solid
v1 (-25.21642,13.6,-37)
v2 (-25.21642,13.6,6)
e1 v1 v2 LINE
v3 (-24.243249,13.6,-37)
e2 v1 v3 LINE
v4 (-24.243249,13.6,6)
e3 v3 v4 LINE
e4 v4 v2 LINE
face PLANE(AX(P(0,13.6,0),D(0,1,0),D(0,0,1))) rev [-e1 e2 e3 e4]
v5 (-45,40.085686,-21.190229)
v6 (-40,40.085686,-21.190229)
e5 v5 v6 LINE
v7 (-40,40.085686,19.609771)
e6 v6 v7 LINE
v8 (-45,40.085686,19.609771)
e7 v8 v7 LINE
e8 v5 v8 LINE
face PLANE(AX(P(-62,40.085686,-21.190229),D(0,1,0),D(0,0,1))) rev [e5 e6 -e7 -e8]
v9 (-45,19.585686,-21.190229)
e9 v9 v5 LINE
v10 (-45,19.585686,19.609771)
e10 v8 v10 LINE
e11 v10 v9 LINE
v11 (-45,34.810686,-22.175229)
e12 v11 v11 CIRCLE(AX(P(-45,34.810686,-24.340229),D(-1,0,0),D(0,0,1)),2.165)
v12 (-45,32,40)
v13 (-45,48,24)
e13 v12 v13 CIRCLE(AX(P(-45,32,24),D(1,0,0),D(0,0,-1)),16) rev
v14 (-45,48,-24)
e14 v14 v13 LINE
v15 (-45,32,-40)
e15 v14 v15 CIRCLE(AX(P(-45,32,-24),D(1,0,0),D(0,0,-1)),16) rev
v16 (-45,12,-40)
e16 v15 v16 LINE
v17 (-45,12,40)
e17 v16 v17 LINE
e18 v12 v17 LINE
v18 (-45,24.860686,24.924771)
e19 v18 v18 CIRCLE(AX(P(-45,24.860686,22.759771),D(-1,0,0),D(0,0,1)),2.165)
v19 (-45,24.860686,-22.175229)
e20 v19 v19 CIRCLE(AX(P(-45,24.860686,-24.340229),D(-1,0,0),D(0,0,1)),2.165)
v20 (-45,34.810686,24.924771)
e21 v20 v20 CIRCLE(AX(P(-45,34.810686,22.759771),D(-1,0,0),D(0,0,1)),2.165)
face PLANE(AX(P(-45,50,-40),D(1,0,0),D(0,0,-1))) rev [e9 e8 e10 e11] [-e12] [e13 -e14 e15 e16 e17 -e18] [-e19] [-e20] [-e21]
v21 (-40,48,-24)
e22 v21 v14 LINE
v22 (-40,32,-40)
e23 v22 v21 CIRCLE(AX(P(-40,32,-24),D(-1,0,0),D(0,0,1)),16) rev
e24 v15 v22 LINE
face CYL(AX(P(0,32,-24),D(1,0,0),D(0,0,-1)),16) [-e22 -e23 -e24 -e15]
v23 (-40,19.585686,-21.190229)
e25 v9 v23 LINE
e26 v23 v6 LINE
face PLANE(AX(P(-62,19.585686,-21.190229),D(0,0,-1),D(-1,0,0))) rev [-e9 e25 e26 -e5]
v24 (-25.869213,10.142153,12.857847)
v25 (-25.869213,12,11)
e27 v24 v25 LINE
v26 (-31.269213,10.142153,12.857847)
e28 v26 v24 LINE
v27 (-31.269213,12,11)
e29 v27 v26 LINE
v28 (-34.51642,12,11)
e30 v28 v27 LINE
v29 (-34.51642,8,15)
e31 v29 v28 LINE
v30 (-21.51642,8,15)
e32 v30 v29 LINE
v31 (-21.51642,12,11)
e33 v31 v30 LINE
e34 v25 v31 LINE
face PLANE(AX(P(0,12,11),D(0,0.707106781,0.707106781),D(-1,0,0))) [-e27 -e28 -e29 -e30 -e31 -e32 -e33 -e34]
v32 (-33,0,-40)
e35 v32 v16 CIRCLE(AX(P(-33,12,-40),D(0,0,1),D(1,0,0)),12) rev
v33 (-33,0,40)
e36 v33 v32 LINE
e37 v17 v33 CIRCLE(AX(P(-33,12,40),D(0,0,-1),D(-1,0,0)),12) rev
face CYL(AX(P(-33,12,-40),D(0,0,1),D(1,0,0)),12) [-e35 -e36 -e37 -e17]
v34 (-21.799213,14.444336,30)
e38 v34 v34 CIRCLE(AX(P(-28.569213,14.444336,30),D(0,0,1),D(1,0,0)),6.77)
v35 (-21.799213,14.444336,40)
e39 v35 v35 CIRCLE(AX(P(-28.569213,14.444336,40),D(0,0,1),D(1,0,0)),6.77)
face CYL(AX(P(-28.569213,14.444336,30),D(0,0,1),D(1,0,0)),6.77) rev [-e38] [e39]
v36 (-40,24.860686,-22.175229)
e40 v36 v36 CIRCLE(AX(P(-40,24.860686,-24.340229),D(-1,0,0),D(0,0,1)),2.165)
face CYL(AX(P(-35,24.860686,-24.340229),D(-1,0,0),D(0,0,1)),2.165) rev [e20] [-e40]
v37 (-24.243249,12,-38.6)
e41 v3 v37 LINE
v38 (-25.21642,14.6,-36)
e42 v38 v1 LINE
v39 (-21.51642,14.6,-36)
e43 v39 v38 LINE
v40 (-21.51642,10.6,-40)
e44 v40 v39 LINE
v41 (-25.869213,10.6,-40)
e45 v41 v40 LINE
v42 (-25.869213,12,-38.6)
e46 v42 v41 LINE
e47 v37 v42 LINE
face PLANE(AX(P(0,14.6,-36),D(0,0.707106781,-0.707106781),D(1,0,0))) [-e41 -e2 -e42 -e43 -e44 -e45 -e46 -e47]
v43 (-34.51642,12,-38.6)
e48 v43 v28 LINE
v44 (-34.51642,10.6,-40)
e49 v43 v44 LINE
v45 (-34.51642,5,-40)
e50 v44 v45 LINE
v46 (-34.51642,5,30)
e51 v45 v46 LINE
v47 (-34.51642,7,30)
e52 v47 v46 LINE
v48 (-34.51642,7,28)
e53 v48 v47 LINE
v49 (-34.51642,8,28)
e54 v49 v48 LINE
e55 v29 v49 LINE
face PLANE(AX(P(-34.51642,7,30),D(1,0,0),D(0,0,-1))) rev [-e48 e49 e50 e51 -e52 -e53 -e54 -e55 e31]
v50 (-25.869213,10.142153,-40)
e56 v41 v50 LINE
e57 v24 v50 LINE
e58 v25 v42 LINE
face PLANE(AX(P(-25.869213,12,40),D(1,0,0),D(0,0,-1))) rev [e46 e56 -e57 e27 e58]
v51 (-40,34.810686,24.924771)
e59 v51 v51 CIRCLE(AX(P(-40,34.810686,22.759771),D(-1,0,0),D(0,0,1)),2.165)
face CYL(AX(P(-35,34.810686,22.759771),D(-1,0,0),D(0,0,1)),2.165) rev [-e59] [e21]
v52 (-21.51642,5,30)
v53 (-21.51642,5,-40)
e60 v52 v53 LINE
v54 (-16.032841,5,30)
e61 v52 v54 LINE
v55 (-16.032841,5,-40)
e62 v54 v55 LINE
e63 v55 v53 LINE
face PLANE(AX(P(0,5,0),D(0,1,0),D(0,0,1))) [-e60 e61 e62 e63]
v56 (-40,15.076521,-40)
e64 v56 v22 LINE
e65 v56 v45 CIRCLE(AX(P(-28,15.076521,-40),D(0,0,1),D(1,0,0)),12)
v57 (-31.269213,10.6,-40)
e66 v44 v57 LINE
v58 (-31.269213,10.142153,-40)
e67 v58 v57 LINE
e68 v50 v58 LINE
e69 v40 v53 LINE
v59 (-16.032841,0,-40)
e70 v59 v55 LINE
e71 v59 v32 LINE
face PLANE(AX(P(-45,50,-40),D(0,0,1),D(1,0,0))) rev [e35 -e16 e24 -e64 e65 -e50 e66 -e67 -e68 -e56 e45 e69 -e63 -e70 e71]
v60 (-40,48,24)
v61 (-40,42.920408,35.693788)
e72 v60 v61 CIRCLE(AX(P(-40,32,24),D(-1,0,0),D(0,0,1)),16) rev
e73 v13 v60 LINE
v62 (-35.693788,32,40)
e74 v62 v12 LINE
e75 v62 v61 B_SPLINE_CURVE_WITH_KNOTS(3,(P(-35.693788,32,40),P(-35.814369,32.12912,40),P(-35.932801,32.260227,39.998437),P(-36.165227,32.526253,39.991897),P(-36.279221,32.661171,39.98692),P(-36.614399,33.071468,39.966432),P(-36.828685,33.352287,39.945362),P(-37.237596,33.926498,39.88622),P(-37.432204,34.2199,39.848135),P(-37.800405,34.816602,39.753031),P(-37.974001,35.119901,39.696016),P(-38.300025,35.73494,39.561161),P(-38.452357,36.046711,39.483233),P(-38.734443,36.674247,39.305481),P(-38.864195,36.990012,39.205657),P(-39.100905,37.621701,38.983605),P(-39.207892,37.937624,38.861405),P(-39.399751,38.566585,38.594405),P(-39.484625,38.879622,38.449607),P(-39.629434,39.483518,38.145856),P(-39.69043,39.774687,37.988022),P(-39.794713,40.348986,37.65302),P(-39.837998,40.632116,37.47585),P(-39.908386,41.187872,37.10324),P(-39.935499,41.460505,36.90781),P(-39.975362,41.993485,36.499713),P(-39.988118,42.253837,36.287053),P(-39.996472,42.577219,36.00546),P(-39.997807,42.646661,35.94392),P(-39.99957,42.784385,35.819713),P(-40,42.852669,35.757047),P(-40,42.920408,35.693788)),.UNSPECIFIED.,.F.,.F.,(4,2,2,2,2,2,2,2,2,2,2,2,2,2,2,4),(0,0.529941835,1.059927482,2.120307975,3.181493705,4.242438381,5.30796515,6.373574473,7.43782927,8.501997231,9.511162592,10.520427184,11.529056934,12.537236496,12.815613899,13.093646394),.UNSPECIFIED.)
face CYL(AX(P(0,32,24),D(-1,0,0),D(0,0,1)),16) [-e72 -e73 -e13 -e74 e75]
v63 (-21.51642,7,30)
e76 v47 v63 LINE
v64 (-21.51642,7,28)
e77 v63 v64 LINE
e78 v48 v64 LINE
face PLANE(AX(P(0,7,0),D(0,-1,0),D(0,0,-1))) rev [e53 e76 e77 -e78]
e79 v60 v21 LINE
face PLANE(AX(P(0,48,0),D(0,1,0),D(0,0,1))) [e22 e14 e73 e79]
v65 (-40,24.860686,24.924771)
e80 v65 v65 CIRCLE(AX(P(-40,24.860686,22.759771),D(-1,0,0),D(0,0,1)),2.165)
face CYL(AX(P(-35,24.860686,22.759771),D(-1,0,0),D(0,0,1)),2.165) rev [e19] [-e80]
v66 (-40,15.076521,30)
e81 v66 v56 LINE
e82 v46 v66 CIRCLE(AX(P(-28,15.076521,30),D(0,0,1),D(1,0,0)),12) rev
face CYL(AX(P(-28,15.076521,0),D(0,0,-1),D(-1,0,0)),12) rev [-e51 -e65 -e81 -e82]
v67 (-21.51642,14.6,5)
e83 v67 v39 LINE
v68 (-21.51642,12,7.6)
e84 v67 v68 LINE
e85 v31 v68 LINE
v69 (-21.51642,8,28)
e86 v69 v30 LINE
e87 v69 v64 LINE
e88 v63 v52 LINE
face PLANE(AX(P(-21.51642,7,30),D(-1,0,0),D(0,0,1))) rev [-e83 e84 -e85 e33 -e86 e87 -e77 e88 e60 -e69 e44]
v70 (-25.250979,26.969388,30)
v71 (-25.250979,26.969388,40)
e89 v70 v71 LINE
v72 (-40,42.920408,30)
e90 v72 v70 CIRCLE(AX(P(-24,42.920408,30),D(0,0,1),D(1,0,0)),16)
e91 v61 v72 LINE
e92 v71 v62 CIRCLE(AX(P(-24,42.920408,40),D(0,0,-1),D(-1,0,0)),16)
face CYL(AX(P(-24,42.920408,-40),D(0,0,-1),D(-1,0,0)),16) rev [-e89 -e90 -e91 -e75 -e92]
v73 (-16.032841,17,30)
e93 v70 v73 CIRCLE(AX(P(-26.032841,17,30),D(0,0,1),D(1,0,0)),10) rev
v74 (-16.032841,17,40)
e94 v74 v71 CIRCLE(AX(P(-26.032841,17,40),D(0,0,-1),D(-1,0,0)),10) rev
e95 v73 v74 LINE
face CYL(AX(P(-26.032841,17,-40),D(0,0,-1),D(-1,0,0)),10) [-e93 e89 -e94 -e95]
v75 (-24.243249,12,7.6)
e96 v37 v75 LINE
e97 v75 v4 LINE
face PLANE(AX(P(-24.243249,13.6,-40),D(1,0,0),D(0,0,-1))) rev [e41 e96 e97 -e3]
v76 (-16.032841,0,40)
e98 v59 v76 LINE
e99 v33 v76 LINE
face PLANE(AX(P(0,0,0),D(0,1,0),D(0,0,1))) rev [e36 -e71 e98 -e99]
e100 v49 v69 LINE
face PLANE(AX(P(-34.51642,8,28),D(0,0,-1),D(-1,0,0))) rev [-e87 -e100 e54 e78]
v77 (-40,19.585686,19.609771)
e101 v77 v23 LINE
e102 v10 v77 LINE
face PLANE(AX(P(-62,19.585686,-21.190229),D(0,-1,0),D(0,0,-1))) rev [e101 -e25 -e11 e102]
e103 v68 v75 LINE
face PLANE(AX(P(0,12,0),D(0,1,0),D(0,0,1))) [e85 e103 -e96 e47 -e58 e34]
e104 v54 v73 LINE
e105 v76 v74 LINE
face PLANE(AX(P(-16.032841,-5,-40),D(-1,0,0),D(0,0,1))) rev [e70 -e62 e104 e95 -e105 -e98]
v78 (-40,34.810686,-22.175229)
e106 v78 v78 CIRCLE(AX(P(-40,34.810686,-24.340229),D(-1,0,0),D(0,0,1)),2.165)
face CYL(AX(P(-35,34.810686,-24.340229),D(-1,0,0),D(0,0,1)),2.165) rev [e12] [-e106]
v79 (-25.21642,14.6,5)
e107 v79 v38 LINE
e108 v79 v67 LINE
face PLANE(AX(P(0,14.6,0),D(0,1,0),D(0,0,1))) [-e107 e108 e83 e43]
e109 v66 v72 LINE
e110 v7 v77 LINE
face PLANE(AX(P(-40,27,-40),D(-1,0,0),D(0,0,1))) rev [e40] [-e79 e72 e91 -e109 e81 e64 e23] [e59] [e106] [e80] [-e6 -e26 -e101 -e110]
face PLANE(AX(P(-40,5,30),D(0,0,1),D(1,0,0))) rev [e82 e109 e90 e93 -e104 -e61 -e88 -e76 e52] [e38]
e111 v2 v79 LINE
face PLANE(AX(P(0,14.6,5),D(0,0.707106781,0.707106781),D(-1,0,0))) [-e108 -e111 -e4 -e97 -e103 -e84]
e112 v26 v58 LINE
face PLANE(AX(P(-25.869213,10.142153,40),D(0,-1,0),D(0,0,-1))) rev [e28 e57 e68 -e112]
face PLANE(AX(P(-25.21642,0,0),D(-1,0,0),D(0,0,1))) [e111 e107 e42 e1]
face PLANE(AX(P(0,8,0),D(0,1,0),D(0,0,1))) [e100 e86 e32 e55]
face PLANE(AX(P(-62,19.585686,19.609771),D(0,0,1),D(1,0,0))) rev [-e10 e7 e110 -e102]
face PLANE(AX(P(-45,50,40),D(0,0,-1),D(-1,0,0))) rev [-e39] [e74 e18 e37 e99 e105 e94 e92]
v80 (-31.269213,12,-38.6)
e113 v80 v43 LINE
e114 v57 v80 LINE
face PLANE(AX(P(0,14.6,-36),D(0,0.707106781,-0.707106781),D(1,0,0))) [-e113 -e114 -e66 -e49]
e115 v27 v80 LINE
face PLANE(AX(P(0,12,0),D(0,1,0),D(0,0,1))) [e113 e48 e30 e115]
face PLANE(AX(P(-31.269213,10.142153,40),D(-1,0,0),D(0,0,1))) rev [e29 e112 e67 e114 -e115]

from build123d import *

# Parameters (mm, degrees)
CROQUIS1_W              = 90
CROQUIS1_H              = 80
SALIENTE_EXTRUIR1_DEPTH = 50
CROQUIS2_W              = 85
CROQUIS2_H              = 80
CORTAR_EXTRUIR1_DEPTH   = 23
CROQUIS3_W              = 61.032840672
CROQUIS3_H              = 80
CORTAR_EXTRUIR2_DEPTH   = 32
CROQUIS4_W              = 23.967159328
CROQUIS4_H              = 70
CORTAR_EXTRUIR3_DEPTH   = 22
CROQUIS7_R              = 6.77
CORTAR_EXTRUIR6_DEPTH   = 10
CROQUIS11_W             = 13
CROQUIS11_H             = 70
SALIENTE_EXTRUIR2_DEPTH = 2
CROQUIS12_W             = 13
CROQUIS12_H             = 55
SALIENTE_EXTRUIR3_DEPTH = 5
REDONDEO3_R             = 12
REDONDEO4_R             = 12
CROQUIS14_W             = 13
CROQUIS14_H             = 13
SALIENTE_EXTRUIR4_DEPTH = 1
CROQUIS17_W             = 2.726828244
CROQUIS17_H             = 50
SALIENTE_EXTRUIR5_DEPTH = 1.6
CROQUIS18_W             = 5
CROQUIS18_H             = 50
SALIENTE_EXTRUIR6_DEPTH = 1
CHAFL_N2_SIZE           = 4
CHAFL_N4_SIZE           = 4
CROQUIS19_R             = 2.165
CORTAR_EXTRUIR10_DEPTH  = 10
CROQUIS20_W             = 5.4
CROQUIS20_H             = 1.857846889
CORTAR_EXTRUIR11_DEPTH  = 80
REDONDEO10_R            = 10
CROQUIS23_W             = 40.8
CROQUIS23_H             = 20.5
CORTAR_EXTRUIR12_DEPTH  = 22
CROQUIS24_W             = 5
CROQUIS24_H             = 80
CORTAR_EXTRUIR14_DEPTH  = 2
REDONDEO13_R            = 16
REDONDEO14_START        = 30
REDONDEO14_DEPTH        = 2.2192
REDONDEO14_START_2      = 32.2192
REDONDEO14_2_DEPTH      = 7.7808
REDONDEO14_START_3      = -40
REDONDEO14_3_DEPTH      = 14.749021125
CORTAR_EXTRUIR16_DEPTH  = 1.3
CHAFL_N5_SIZE           = 5


with BuildPart() as part:
    # Croquis1 → Saliente-Extruir1 (new body)
    with BuildSketch(Plane(origin=(0, 0, 0), x_dir=(1, 0, 0), z_dir=(0, 1, 0))):
        Rectangle(CROQUIS1_W, CROQUIS1_H)
    extrude(amount=SALIENTE_EXTRUIR1_DEPTH)

    # Croquis2 → Cortar-Extruir1 (cut)
    with BuildSketch(Plane(origin=(0, 50, 0), x_dir=(1, 0, 0), z_dir=(0, 1, 0))):
        with Locations((2.5, 0)):
            Rectangle(CROQUIS2_W, CROQUIS2_H)
    extrude(amount=-CORTAR_EXTRUIR1_DEPTH, mode=Mode.SUBTRACT)

    # Croquis3 → Cortar-Extruir2 (cut)
    with BuildSketch(Plane(origin=(0, 27, 0), x_dir=(1, 0, 0), z_dir=(0, 1, 0))):
        with Locations((14.483579664, 0)):
            Rectangle(CROQUIS3_W, CROQUIS3_H)
    extrude(amount=-CORTAR_EXTRUIR2_DEPTH, mode=Mode.SUBTRACT)

    # Croquis4 → Cortar-Extruir3 (cut)
    with BuildSketch(Plane(origin=(0, 27, 0), x_dir=(1, 0, 0), z_dir=(0, 1, 0))):
        with Locations((-28.016420336, 5)):
            Rectangle(CROQUIS4_W, CROQUIS4_H)
    extrude(amount=-CORTAR_EXTRUIR3_DEPTH, mode=Mode.SUBTRACT)

    # Croquis7 → Cortar-Extruir6 (cut)
    with BuildSketch(Plane.XY.offset(40)):
        with Locations((-28.569213332, 14.444335644)):
            Circle(CROQUIS7_R)
    extrude(amount=-CORTAR_EXTRUIR6_DEPTH, mode=Mode.SUBTRACT)

    # Croquis11 → Saliente-Extruir2 (add)
    with BuildSketch(Plane(origin=(0, 5, 0), x_dir=(1, 0, 0), z_dir=(0, 1, 0))):
        with Locations((-28.016420336, 5)):
            Rectangle(CROQUIS11_W, CROQUIS11_H)
    extrude(amount=SALIENTE_EXTRUIR2_DEPTH)

    # Croquis12 → Saliente-Extruir3 (add)
    with BuildSketch(Plane(origin=(0, 7, 0), x_dir=(1, 0, 0), z_dir=(0, 1, 0))):
        with Locations((-28.016420336, 12.5)):
            Rectangle(CROQUIS12_W, CROQUIS12_H)
    extrude(amount=SALIENTE_EXTRUIR3_DEPTH)

    # Redondeo3
    # the kernel refuses this fillet: 12 mm, written as the material it adds along each edge
    with BuildSketch(Plane(origin=(-40, 5, 30), x_dir=(1.0, 1.01847082473682e-12, 0), z_dir=(0, 0, -1))) as redondeo3_piece_1:
        with BuildLine():
            CenterArc((12, -10.076520531), REDONDEO3_R, 122.890486336, 57.109513664)
            Line((0, -10.076520531), (-0.24, -10.076520531))
            Line((-0.24, -10.076520531), (-0.24, 0))
            Line((-0.24, 0), (0, 0.24))
            ThreePointArc((0, 0.24), (2.741789832, 0.24), (5.353251257, 0.201530411))
            Line((5.353251257, 0.201530411), (5.483579664, 0))
        make_face()
    extrude(amount=70)

    # Redondeo4
    redondeo4_edges = [part.edges().sort_by_distance(p)[0] for p in [
        (-45, 0, 0),
    ]]
    fillet(redondeo4_edges, radius=REDONDEO4_R)

    # Croquis14 → Saliente-Extruir4 (add)
    with BuildSketch(Plane(origin=(0, 7, 0), x_dir=(1, 0, 0), z_dir=(0, 1, 0))):
        with Locations((-28.016420336, -21.5)):
            Rectangle(CROQUIS14_W, CROQUIS14_H)
    extrude(amount=SALIENTE_EXTRUIR4_DEPTH)

    # Croquis17 → Saliente-Extruir5 (add)
    with BuildSketch(Plane(origin=(0, 12, 0), x_dir=(1, 0, 0), z_dir=(0, 1, 0))):
        with Locations((-22.879834458, 15)):
            Rectangle(CROQUIS17_W, CROQUIS17_H)
    extrude(amount=SALIENTE_EXTRUIR5_DEPTH)

    # Croquis18 → Saliente-Extruir6 (add)
    with BuildSketch(Plane(origin=(0, 13.6, 0), x_dir=(1, 0, 0), z_dir=(0, 1, 0))):
        with Locations((-24.016420336, 15)):
            Rectangle(CROQUIS18_W, CROQUIS18_H)
    extrude(amount=SALIENTE_EXTRUIR6_DEPTH)

    # Chaflán2
    chafl_n2_edges = [part.edges().sort_by_distance(p)[0] for p in [
        (-28.016420336, 12, 15),
    ]]
    chamfer(chafl_n2_edges, length=CHAFL_N2_SIZE - 0.0001)  # a hair under: the kernel refuses the full size

    # Chaflán4
    chafl_n4_edges = [part.edges().sort_by_distance(p)[0] for p in [
        (-24.016420336, 14.6, -40),
    ]]
    chamfer(chafl_n4_edges, length=CHAFL_N4_SIZE)

    # Croquis19 → Cortar-Extruir10 (cut)
    with BuildSketch(Plane.ZY.offset(45)):
        with Locations((-24.340228639, 34.810686035)):
            Circle(CROQUIS19_R)
        with Locations((-24.340228639, 24.860686035)):
            Circle(CROQUIS19_R)
        with Locations((22.759771361, 34.810686035)):
            Circle(CROQUIS19_R)
        with Locations((22.759771361, 24.860686035)):
            Circle(CROQUIS19_R)
    extrude(amount=-CORTAR_EXTRUIR10_DEPTH, mode=Mode.SUBTRACT)

    # Croquis20 → Cortar-Extruir11 (cut)
    with BuildSketch(Plane(origin=(0, 0, -40), x_dir=(-1, 0, 0), z_dir=(0, 0, -1))):
        with Locations((28.569213332, 11.071076555)):
            Rectangle(CROQUIS20_W, CROQUIS20_H)
    extrude(amount=-CORTAR_EXTRUIR11_DEPTH, mode=Mode.SUBTRACT)

    # Redondeo10
    redondeo10_edges = [part.edges().sort_by_distance(p)[0] for p in [
        (-16.032840672, 27, 35),
    ]]
    fillet(redondeo10_edges, radius=REDONDEO10_R)

    # Croquis23 → Cortar-Extruir12 (cut)
    with BuildSketch(Plane(origin=(-40, 0, 0), x_dir=(0, 0, -1), z_dir=(1, 0, 0))):
        with Locations((0.790228639, 29.835686035)):
            Rectangle(CROQUIS23_W, CROQUIS23_H)
    extrude(amount=-CORTAR_EXTRUIR12_DEPTH, mode=Mode.SUBTRACT)

    # Croquis24 → Cortar-Extruir14 (cut)
    with BuildSketch(Plane(origin=(0, 50, 0), x_dir=(1, 0, 0), z_dir=(0, 1, 0))):
        with Locations((-42.5, 0)):
            Rectangle(CROQUIS24_W, CROQUIS24_H)
    extrude(amount=-CORTAR_EXTRUIR14_DEPTH, mode=Mode.SUBTRACT)

    # Redondeo13
    redondeo13_edges = [part.edges().sort_by_distance(p)[0] for p in [
        (-42.5, 48, -40),
        (-42.5, 48, 40),
    ]]
    fillet(redondeo13_edges, radius=REDONDEO13_R)

    # Redondeo14: read off the stored shape, not the designer's step
    # Redondeo14 outline → Redondeo14 (add)
    with BuildSketch(Plane.XY.offset(REDONDEO14_START)):
        with BuildLine():
            ThreePointArc((-26.032840672, 27), (-25.641610248, 26.992344007), (-25.250978875, 26.969387751))
            ThreePointArc((-25.250978875, 26.969387751), (-35.747673429, 32.057988118), (-40, 42.920408153))
            Line((-40, 42.920408153), (-40, 27))
            Line((-40, 27), (-26.032840672, 27))
        make_face()
    extrude(amount=REDONDEO14_DEPTH)

    # Redondeo14 2 outline → Redondeo14 2 (add)
    with BuildSketch(Plane.XY.offset(REDONDEO14_START_2)):
        with BuildLine():
            ThreePointArc((-26.032840672, 27), (-25.641610248, 26.992344007), (-25.250978875, 26.969387751))
            ThreePointArc((-25.250978875, 26.969387751), (-35.747673429, 32.057988118), (-40, 42.920408153))
            Line((-40, 42.920408153), (-40, 27))
            Line((-40, 27), (-26.032840672, 27))
        make_face()
    extrude(amount=REDONDEO14_2_DEPTH)

    # Redondeo14 3 outline → Redondeo14 3 (cut)
    with BuildSketch(Plane.YZ.offset(REDONDEO14_START_3)):
        with BuildLine():
            Line((31, 40), (32, 40))
            ThreePointArc((32, 40), (38.583005244, 38.583005244), (44, 34.583005244))
            Line((44, 34.583005244), (44, 41))
            Line((44, 41), (31, 41))
            Line((31, 41), (31, 40))
        make_face()
    extrude(amount=REDONDEO14_3_DEPTH, mode=Mode.SUBTRACT)

    # Croquis25 → Cortar-Extruir16 (cut)
    with BuildSketch(Plane.ZY.offset(26.516420336)):
        Polygon((-36, 14.6), (10, 14.6), (10, 13.6), (-37, 13.6), align=None)
    extrude(amount=-CORTAR_EXTRUIR16_DEPTH, mode=Mode.SUBTRACT)

    # Chaflán5
    # the kernel refuses this chamfer: 5 mm, written as the material it takes off along each edge
    with BuildSketch(Plane(origin=(-8.658005396, 14.6, 10), x_dir=(0, 0, -1), z_dir=(-1, 0, 0))) as chafl_n5_piece_1_section:
        Polygon((CHAFL_N5_SIZE, 0), (0, CHAFL_N5_SIZE), (0, 0), align=None)
    chafl_n5_piece_1 = extrude(amount=29.41682988, mode=Mode.PRIVATE)
    chafl_n5_piece_1 = split(chafl_n5_piece_1, bisect_by=Plane(origin=(-8.658005396, 12, 10), z_dir=(0, 1, 0)), keep=Keep.TOP, mode=Mode.PRIVATE)
    add(chafl_n5_piece_1, mode=Mode.SUBTRACT)


solid = part.part
